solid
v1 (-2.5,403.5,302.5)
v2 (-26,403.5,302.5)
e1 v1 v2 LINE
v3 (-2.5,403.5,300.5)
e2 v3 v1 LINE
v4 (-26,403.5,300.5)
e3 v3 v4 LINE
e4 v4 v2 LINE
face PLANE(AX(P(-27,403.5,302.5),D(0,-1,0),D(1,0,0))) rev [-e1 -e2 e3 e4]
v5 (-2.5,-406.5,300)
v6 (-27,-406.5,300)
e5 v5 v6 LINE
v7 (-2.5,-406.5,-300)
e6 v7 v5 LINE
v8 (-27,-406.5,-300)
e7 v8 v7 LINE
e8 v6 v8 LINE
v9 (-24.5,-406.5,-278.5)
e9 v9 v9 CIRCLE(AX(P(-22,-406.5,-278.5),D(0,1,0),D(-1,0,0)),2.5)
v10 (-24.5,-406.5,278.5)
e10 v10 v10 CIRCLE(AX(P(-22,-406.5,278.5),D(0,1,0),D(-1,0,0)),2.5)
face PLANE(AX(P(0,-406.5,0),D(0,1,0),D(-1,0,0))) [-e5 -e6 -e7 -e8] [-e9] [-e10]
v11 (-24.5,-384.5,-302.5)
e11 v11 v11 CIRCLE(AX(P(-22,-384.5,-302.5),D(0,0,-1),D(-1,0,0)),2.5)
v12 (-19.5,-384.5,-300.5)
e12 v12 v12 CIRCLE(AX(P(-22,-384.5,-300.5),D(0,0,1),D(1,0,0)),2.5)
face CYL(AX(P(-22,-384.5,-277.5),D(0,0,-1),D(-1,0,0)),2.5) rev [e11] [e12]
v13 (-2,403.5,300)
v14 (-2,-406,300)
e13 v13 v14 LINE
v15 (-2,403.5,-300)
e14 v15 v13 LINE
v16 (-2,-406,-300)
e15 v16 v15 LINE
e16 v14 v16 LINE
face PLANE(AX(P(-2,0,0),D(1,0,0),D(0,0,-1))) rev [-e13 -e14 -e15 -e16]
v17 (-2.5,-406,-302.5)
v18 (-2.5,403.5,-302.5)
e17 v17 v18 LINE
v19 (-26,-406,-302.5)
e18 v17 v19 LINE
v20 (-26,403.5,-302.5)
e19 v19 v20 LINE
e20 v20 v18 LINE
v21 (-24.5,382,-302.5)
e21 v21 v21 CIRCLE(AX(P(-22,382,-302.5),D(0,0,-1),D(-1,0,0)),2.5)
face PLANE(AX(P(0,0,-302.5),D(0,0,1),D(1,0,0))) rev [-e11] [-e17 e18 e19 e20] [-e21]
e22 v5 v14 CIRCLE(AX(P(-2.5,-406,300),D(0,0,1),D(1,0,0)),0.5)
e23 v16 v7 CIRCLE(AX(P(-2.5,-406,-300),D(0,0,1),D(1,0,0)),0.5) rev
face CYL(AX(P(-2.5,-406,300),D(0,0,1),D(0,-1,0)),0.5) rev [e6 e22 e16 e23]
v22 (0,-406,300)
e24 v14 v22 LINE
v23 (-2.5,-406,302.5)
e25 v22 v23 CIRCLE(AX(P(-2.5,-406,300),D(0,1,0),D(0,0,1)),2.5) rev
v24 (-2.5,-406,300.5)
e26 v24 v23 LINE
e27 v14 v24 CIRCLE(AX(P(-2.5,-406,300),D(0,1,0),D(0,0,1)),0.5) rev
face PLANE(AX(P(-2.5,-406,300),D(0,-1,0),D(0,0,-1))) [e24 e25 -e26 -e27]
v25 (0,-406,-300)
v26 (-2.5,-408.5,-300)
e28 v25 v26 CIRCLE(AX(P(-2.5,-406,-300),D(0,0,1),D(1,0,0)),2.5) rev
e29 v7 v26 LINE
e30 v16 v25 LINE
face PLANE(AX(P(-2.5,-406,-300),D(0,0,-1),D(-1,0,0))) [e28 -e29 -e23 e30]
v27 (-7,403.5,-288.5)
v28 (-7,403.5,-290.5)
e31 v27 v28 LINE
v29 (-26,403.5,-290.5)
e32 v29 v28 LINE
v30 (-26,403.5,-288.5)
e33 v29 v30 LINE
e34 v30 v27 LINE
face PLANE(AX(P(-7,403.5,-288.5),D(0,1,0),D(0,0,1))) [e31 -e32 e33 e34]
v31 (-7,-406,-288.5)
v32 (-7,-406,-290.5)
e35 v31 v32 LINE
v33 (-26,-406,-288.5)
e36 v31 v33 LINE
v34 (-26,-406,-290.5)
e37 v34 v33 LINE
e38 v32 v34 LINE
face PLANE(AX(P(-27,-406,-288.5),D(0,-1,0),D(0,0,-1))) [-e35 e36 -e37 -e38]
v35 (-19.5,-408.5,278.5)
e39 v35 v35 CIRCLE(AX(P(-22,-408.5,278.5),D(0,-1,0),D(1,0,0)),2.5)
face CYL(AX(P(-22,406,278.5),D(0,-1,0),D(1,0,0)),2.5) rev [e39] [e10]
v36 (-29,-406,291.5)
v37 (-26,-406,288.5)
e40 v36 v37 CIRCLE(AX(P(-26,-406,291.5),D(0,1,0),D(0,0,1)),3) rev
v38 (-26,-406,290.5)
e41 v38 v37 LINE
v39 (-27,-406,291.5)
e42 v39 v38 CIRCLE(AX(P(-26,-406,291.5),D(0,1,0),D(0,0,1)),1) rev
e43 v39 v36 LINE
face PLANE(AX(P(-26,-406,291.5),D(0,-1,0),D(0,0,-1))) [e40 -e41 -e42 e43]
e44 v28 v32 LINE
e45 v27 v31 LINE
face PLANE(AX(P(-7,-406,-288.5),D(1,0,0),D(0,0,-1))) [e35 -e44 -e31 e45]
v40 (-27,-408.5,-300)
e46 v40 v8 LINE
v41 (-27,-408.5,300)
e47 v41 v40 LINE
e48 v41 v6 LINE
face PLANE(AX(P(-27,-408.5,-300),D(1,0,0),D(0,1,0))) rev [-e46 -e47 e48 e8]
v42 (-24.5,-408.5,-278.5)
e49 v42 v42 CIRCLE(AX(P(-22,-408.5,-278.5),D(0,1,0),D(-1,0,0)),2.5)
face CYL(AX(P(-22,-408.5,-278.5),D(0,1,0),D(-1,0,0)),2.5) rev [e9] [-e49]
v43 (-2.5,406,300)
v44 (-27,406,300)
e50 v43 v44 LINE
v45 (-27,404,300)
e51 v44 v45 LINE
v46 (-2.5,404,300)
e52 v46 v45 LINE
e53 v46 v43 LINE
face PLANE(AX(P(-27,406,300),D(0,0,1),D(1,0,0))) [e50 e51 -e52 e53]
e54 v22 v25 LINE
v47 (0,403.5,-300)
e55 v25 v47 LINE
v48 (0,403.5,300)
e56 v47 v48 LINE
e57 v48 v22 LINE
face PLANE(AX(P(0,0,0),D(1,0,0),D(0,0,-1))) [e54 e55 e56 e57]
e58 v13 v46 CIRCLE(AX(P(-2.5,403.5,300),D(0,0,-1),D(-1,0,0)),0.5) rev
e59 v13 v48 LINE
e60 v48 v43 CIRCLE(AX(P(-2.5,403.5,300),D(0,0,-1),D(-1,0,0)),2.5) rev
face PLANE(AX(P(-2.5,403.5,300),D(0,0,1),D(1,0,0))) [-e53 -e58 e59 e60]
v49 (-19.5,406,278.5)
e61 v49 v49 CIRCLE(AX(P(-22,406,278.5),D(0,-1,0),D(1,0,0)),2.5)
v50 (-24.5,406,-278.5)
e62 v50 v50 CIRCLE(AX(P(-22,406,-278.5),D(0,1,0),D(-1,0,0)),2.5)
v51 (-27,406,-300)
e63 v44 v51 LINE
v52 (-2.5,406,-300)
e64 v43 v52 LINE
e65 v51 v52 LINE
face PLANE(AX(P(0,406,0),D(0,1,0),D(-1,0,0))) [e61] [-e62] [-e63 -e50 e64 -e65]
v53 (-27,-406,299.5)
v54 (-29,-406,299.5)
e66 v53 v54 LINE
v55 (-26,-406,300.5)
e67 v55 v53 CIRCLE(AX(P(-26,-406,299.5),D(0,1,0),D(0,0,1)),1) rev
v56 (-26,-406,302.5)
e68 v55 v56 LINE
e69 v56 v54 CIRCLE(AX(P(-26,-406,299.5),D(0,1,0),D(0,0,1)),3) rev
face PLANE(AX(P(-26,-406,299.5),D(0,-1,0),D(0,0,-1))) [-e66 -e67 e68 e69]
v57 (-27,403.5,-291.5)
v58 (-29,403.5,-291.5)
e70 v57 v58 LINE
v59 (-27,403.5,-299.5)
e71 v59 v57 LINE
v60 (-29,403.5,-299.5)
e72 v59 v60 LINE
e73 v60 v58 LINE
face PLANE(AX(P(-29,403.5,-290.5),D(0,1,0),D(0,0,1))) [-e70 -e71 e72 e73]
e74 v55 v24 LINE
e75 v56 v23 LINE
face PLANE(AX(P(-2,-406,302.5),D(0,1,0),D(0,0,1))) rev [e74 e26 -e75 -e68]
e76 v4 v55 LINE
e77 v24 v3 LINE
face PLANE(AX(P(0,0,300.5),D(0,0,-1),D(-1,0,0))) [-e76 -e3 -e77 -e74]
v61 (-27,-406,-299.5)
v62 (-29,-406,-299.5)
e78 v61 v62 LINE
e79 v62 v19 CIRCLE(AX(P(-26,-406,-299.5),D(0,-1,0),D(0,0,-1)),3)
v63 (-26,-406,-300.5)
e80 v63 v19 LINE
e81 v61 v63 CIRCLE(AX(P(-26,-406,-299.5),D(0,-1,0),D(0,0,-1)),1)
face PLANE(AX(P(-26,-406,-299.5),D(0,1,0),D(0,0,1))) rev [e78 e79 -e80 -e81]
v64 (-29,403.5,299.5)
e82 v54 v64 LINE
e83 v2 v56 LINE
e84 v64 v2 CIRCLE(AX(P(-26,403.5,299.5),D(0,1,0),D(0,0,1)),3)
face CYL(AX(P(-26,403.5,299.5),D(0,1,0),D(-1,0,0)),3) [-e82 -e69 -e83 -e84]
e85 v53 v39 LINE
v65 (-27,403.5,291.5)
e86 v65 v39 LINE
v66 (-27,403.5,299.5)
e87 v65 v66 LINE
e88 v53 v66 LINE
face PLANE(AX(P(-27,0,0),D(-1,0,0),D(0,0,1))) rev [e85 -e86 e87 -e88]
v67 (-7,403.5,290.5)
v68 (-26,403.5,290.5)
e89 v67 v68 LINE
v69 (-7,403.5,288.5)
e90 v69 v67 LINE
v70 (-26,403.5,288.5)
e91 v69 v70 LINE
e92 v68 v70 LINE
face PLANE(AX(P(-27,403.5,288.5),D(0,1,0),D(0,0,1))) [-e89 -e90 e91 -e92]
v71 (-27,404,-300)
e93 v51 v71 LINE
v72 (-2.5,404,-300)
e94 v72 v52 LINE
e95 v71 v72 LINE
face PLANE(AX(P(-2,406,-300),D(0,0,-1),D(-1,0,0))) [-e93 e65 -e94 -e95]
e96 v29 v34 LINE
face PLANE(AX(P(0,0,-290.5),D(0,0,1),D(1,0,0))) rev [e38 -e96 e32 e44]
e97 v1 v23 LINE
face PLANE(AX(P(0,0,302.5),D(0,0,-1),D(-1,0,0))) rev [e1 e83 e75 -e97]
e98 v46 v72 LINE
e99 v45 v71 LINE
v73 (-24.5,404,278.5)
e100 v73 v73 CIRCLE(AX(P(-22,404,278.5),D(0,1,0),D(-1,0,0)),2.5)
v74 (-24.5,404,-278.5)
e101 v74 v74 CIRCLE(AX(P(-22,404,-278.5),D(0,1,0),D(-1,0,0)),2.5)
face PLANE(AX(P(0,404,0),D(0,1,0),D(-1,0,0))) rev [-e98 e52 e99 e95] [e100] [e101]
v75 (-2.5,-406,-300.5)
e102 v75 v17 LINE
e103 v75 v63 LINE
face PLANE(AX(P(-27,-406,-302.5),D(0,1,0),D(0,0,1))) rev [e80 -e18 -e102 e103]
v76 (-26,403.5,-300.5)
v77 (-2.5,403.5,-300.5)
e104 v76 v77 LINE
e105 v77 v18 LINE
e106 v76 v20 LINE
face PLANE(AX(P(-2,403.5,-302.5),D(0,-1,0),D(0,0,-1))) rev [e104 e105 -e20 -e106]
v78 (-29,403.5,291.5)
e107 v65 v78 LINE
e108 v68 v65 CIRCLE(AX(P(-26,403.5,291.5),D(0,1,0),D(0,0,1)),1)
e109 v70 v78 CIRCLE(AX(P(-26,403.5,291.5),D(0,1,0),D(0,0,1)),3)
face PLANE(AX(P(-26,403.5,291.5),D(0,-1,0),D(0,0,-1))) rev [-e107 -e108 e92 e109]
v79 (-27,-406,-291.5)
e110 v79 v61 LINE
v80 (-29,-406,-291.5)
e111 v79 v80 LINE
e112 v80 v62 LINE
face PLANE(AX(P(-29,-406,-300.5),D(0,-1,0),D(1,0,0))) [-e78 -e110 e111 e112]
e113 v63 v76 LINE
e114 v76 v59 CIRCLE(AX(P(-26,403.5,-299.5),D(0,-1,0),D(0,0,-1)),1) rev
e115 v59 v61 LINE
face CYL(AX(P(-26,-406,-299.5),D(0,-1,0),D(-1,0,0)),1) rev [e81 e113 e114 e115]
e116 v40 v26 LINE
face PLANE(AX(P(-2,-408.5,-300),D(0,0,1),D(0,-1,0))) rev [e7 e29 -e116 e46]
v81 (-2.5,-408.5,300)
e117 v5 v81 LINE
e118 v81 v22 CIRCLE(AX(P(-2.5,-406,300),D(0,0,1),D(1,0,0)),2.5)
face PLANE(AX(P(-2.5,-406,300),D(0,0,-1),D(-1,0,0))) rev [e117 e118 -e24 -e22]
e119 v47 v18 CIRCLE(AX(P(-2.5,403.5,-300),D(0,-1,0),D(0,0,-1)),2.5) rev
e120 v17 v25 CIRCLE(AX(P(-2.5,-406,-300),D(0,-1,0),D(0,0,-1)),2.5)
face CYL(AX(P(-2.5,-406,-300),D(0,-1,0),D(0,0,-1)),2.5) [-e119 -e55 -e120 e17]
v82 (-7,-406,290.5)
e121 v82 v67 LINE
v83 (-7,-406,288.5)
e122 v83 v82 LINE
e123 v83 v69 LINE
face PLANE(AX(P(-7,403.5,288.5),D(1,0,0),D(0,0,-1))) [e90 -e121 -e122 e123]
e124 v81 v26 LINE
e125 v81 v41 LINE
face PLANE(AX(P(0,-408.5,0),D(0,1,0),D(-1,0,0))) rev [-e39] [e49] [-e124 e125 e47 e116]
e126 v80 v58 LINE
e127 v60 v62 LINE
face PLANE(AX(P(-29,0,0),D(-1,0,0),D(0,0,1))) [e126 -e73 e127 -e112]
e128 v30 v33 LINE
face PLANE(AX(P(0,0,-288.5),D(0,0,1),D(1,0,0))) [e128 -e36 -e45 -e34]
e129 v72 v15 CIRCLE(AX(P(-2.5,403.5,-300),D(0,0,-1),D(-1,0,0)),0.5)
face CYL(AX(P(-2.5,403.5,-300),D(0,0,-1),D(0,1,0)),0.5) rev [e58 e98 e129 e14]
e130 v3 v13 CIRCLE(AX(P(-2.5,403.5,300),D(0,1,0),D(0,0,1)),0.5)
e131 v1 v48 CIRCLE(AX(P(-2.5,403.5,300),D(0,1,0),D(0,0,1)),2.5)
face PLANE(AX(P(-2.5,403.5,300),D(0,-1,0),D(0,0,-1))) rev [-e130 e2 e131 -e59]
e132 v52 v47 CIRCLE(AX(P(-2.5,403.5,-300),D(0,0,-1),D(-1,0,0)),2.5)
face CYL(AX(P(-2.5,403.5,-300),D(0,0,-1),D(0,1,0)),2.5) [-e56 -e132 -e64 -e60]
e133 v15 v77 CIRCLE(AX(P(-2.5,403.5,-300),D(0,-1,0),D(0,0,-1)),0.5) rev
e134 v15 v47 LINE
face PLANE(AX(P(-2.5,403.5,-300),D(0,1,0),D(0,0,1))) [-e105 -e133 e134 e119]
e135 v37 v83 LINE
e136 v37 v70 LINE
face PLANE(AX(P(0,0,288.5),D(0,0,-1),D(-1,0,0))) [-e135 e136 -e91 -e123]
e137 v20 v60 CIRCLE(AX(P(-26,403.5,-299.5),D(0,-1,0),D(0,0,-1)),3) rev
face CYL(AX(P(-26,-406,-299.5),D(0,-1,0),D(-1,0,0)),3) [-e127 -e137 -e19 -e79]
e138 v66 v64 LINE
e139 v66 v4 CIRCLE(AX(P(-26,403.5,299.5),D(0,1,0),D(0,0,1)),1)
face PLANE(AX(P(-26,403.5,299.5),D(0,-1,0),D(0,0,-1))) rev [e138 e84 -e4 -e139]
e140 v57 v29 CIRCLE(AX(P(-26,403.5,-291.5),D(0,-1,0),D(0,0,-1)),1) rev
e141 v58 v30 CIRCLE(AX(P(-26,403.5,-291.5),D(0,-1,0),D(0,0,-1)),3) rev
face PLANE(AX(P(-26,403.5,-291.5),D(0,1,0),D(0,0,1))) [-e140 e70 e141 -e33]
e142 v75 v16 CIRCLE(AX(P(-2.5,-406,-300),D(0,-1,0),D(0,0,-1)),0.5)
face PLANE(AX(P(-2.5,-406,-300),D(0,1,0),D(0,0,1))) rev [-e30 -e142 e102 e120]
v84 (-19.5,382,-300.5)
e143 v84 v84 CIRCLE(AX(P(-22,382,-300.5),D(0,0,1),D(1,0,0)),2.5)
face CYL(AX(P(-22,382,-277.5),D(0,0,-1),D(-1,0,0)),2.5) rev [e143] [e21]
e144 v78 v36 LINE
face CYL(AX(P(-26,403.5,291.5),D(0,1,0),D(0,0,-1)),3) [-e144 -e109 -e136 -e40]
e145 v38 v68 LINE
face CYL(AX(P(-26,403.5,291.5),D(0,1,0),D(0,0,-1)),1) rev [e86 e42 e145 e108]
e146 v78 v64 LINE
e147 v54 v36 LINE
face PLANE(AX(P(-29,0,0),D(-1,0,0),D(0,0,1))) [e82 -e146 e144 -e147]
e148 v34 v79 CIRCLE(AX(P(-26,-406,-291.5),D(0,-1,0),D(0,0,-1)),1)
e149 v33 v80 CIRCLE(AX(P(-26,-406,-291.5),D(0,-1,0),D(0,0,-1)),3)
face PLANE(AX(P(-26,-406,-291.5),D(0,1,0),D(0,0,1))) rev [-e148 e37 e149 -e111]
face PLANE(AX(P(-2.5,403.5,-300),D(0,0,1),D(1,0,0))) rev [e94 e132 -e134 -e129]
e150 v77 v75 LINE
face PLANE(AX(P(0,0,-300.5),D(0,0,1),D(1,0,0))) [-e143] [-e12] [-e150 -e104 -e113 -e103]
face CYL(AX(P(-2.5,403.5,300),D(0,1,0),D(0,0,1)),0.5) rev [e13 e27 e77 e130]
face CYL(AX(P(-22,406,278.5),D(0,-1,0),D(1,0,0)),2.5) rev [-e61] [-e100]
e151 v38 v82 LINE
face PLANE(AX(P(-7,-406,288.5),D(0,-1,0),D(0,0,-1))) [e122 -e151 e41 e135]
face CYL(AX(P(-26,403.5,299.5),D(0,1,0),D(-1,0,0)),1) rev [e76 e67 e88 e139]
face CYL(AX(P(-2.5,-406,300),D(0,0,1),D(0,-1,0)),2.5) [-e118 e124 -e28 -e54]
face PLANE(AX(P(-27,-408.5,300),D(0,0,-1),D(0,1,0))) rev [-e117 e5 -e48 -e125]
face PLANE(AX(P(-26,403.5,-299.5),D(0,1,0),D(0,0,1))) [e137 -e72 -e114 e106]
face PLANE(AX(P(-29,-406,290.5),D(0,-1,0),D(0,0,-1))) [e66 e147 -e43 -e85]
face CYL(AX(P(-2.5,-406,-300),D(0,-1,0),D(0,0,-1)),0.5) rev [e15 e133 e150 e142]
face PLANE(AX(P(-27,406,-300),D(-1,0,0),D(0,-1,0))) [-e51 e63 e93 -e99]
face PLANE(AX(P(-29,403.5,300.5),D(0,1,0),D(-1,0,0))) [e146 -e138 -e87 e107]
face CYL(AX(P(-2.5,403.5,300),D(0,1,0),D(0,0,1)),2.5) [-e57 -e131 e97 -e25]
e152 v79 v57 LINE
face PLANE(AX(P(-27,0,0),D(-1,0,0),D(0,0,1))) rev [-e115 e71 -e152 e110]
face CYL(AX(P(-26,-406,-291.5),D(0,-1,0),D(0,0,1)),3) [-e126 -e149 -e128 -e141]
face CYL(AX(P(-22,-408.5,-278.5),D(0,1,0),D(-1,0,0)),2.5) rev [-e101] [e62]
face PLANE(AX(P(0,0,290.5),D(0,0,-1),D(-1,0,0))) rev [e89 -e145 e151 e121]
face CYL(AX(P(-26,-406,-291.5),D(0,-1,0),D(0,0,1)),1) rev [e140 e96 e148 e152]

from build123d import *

# Parameters (mm, degrees)
SKETCH2_W                    = 600
SKETCH2_H                    = 812
BASE_FLANGE1_DEPTH           = 2
EDGE_FLANGE1_STRIP_W         = 9
EDGE_FLANGE1_STRIP_H         = 2
EDGE_FLANGE1_STRIP_CUT_DEPTH = 600
EDGE_FLANGE1_DEPTH           = 600
EDGE_FLANGE3_DEPTH           = 809.5
EDGE_FLANGE4_DEPTH           = 809.5
EDGE_FLANGE5_DEPTH           = 600
SKETCH22_R                   = 2.5
CUT_EXTRUDE1_DEPTH           = 870.278724001
SKETCH23_R                   = 2.5
CUT_EXTRUDE2_DEPTH           = 870.278724001
SKETCH24_R                   = 2.5
CUT_EXTRUDE3_DEPTH           = 25
EDGE_FLANGE6_STRIP_W         = 10
EDGE_FLANGE6_STRIP_H         = 2
EDGE_FLANGE6_STRIP_CUT_DEPTH = 809.5
EDGE_FLANGE6_DEPTH           = 809.5
EDGE_FLANGE7_STRIP_W         = 10
EDGE_FLANGE7_STRIP_H         = 2
EDGE_FLANGE7_STRIP_CUT_DEPTH = 809.5
EDGE_FLANGE7_DEPTH           = 809.5
EDGE_FLANGE8_STRIP_W         = 10
EDGE_FLANGE8_STRIP_H         = 2
EDGE_FLANGE8_STRIP_CUT_DEPTH = 809.5
EDGE_FLANGE8_DEPTH           = 809.5
EDGE_FLANGE9_STRIP_W         = 10
EDGE_FLANGE9_STRIP_H         = 2
EDGE_FLANGE9_STRIP_CUT_DEPTH = 809.5
EDGE_FLANGE9_DEPTH           = 809.5


# Sheet-metal steps are written as plain solids
with BuildPart() as part:
    # Sketch2 → Base-Flange1 (new body)
    with BuildSketch(Plane(origin=(0, 0, 0), x_dir=(0, 0, -1), z_dir=(1, 0, 0))):
        Rectangle(SKETCH2_W, SKETCH2_H)
    extrude(amount=-BASE_FLANGE1_DEPTH)

    # Edge-Flange1 strip (across the edge) → Edge-Flange1 strip cut (cut)
    with BuildSketch(Plane(origin=(-2, 406, 300), x_dir=(0, -1, 0), z_dir=(0, 0, -1))):
        with Locations((-2, -1)):
            Rectangle(EDGE_FLANGE1_STRIP_W, EDGE_FLANGE1_STRIP_H)
    extrude(amount=EDGE_FLANGE1_STRIP_CUT_DEPTH, mode=Mode.SUBTRACT)

    # Edge-Flange1 section (across the edge) → Edge-Flange1 (add)
    with BuildSketch(Plane(origin=(-2, 406, 300), x_dir=(0, -1, 0), z_dir=(0, 0, -1))):
        with BuildLine():
            Line((0, 0.5), (0, 25))
            Line((0, 25), (2, 25))
            Line((2, 25), (2, 0.5))
            ThreePointArc((2, 0.5), (2.146446609, 0.146446609), (2.5, 0))
            Line((2.5, 0), (2.5, -2))
            ThreePointArc((2.5, -2), (0.732233047, -1.267766953), (0, 0.5))
        make_face()
    extrude(amount=EDGE_FLANGE1_DEPTH)

    # Edge-Flange3 section (across the edge) → Edge-Flange3 (add)
    with BuildSketch(Plane(origin=(-2, -406, 300.5), x_dir=(0, 0, -1), z_dir=(0, 1, 0))):
        with BuildLine():
            Line((-2, 0.5), (-2, 25))
            Line((-2, 25), (0, 25))
            Line((0, 25), (0, 0.5))
            ThreePointArc((0, 0.5), (0.146446609, 0.146446609), (0.5, 0))
            Line((0.5, 0), (0.5, -2))
            ThreePointArc((0.5, -2), (-1.267766953, -1.267766953), (-2, 0.5))
        make_face()
    extrude(amount=EDGE_FLANGE3_DEPTH)

    # Edge-Flange4 section (across the edge) → Edge-Flange4 (add)
    with BuildSketch(Plane(origin=(-2, 403.5, -300.5), x_dir=(0, 0, 1), z_dir=(0, -1, 0))):
        with BuildLine():
            Line((-2, 0.5), (-2, 25))
            Line((-2, 25), (0, 25))
            Line((0, 25), (0, 0.5))
            ThreePointArc((0, 0.5), (0.146446609, 0.146446609), (0.5, 0))
            Line((0.5, 0), (0.5, -2))
            ThreePointArc((0.5, -2), (-1.267766953, -1.267766953), (-2, 0.5))
        make_face()
    extrude(amount=EDGE_FLANGE4_DEPTH)

    # Edge-Flange5 section (across the edge) → Edge-Flange5 (add)
    with BuildSketch(Plane(origin=(-2, -406.5, -300), x_dir=(0, 1, 0), z_dir=(0, 0, 1))):
        with BuildLine():
            Line((-2, 0.5), (-2, 25))
            Line((-2, 25), (0, 25))
            Line((0, 25), (0, 0.5))
            ThreePointArc((0, 0.5), (0.146446609, 0.146446609), (0.5, 0))
            Line((0.5, 0), (0.5, -2))
            ThreePointArc((0.5, -2), (-1.267766953, -1.267766953), (-2, 0.5))
        make_face()
    extrude(amount=EDGE_FLANGE5_DEPTH)

    # Sketch22 → Cut-Extrude1 (cut, through all)
    with BuildSketch(Plane.XZ.offset(408.5)):
        with Locations((-22, 278.5)):
            Circle(SKETCH22_R)
    extrude(amount=-CUT_EXTRUDE1_DEPTH, mode=Mode.SUBTRACT)

    # Sketch23 → Cut-Extrude2 (cut, through all)
    with BuildSketch(Plane(origin=(0, 406, 0), x_dir=(1, 0, 0), z_dir=(0, 1, 0))):
        with Locations(Location((-22, 278.5, 0), (0, 0, 180))):
            Circle(SKETCH23_R)
    extrude(amount=-CUT_EXTRUDE2_DEPTH, mode=Mode.SUBTRACT)

    # Sketch24 → Cut-Extrude3 (cut)
    with BuildSketch(Plane(origin=(0, 0, -302.5), x_dir=(-1, 0, 0), z_dir=(0, 0, -1))):
        with Locations((22, 382)):
            Circle(SKETCH24_R)
        with Locations((22, -384.5)):
            Circle(SKETCH24_R)
    extrude(amount=-CUT_EXTRUDE3_DEPTH, mode=Mode.SUBTRACT)

    # Edge-Flange6 strip (across the edge) → Edge-Flange6 strip cut (cut)
    with BuildSketch(Plane(origin=(-27, 403.5, -300.5), x_dir=(1, 0, 0), z_dir=(0, -1, 0))):
        with Locations((-4, -1)):
            Rectangle(EDGE_FLANGE6_STRIP_W, EDGE_FLANGE6_STRIP_H)
    extrude(amount=EDGE_FLANGE6_STRIP_CUT_DEPTH, mode=Mode.SUBTRACT)

    # Edge-Flange6 section (across the edge) → Edge-Flange6 (add)
    with BuildSketch(Plane(origin=(-27, 403.5, -300.5), x_dir=(1, 0, 0), z_dir=(0, -1, 0))):
        with BuildLine():
            Line((-2, 1), (-2, 10))
            Line((-2, 10), (0, 10))
            Line((0, 10), (0, 1))
            ThreePointArc((0, 1), (0.292893219, 0.292893219), (1, 0))
            Line((1, 0), (1, -2))
            ThreePointArc((1, -2), (-1.121320344, -1.121320344), (-2, 1))
        make_face()
    extrude(amount=EDGE_FLANGE6_DEPTH)

    # Edge-Flange7 strip (across the edge) → Edge-Flange7 strip cut (cut)
    with BuildSketch(Plane(origin=(-27, 403.5, -290.5), x_dir=(0, 0, -1), z_dir=(0, -1, 0))):
        with Locations((-4, -1)):
            Rectangle(EDGE_FLANGE7_STRIP_W, EDGE_FLANGE7_STRIP_H)
    extrude(amount=EDGE_FLANGE7_STRIP_CUT_DEPTH, mode=Mode.SUBTRACT)

    # Edge-Flange7 section (across the edge) → Edge-Flange7 (add)
    with BuildSketch(Plane(origin=(-27, 403.5, -290.5), x_dir=(0, 0, -1), z_dir=(0, -1, 0))):
        with BuildLine():
            Line((-2, 1), (-2, 20))
            Line((-2, 20), (0, 20))
            Line((0, 20), (0, 1))
            ThreePointArc((0, 1), (0.292893219, 0.292893219), (1, 0))
            Line((1, 0), (1, -2))
            ThreePointArc((1, -2), (-1.121320344, -1.121320344), (-2, 1))
        make_face()
    extrude(amount=EDGE_FLANGE7_DEPTH)

    # Edge-Flange8 strip (across the edge) → Edge-Flange8 strip cut (cut)
    with BuildSketch(Plane(origin=(-27, -406, 300.5), x_dir=(1, 0, 0), z_dir=(0, 1, 0))):
        with Locations((-4, -1)):
            Rectangle(EDGE_FLANGE8_STRIP_W, EDGE_FLANGE8_STRIP_H)
    extrude(amount=EDGE_FLANGE8_STRIP_CUT_DEPTH, mode=Mode.SUBTRACT)

    # Edge-Flange8 section (across the edge) → Edge-Flange8 (add)
    with BuildSketch(Plane(origin=(-27, -406, 300.5), x_dir=(1, 0, 0), z_dir=(0, 1, 0))):
        with BuildLine():
            Line((-2, 1), (-2, 10))
            Line((-2, 10), (0, 10))
            Line((0, 10), (0, 1))
            ThreePointArc((0, 1), (0.292893219, 0.292893219), (1, 0))
            Line((1, 0), (1, -2))
            ThreePointArc((1, -2), (-1.121320344, -1.121320344), (-2, 1))
        make_face()
    extrude(amount=EDGE_FLANGE8_DEPTH)

    # Edge-Flange9 strip (across the edge) → Edge-Flange9 strip cut (cut)
    with BuildSketch(Plane(origin=(-27, -406, 290.5), x_dir=(0, 0, 1), z_dir=(0, 1, 0))):
        with Locations((-4, -1)):
            Rectangle(EDGE_FLANGE9_STRIP_W, EDGE_FLANGE9_STRIP_H)
    extrude(amount=EDGE_FLANGE9_STRIP_CUT_DEPTH, mode=Mode.SUBTRACT)

    # Edge-Flange9 section (across the edge) → Edge-Flange9 (add)
    with BuildSketch(Plane(origin=(-27, -406, 290.5), x_dir=(0, 0, 1), z_dir=(0, 1, 0))):
        with BuildLine():
            Line((-2, 1), (-2, 20))
            Line((-2, 20), (0, 20))
            Line((0, 20), (0, 1))
            ThreePointArc((0, 1), (0.292893219, 0.292893219), (1, 0))
            Line((1, 0), (1, -2))
            ThreePointArc((1, -2), (-1.121320344, -1.121320344), (-2, 1))
        make_face()
    extrude(amount=EDGE_FLANGE9_DEPTH)


solid = part.part
